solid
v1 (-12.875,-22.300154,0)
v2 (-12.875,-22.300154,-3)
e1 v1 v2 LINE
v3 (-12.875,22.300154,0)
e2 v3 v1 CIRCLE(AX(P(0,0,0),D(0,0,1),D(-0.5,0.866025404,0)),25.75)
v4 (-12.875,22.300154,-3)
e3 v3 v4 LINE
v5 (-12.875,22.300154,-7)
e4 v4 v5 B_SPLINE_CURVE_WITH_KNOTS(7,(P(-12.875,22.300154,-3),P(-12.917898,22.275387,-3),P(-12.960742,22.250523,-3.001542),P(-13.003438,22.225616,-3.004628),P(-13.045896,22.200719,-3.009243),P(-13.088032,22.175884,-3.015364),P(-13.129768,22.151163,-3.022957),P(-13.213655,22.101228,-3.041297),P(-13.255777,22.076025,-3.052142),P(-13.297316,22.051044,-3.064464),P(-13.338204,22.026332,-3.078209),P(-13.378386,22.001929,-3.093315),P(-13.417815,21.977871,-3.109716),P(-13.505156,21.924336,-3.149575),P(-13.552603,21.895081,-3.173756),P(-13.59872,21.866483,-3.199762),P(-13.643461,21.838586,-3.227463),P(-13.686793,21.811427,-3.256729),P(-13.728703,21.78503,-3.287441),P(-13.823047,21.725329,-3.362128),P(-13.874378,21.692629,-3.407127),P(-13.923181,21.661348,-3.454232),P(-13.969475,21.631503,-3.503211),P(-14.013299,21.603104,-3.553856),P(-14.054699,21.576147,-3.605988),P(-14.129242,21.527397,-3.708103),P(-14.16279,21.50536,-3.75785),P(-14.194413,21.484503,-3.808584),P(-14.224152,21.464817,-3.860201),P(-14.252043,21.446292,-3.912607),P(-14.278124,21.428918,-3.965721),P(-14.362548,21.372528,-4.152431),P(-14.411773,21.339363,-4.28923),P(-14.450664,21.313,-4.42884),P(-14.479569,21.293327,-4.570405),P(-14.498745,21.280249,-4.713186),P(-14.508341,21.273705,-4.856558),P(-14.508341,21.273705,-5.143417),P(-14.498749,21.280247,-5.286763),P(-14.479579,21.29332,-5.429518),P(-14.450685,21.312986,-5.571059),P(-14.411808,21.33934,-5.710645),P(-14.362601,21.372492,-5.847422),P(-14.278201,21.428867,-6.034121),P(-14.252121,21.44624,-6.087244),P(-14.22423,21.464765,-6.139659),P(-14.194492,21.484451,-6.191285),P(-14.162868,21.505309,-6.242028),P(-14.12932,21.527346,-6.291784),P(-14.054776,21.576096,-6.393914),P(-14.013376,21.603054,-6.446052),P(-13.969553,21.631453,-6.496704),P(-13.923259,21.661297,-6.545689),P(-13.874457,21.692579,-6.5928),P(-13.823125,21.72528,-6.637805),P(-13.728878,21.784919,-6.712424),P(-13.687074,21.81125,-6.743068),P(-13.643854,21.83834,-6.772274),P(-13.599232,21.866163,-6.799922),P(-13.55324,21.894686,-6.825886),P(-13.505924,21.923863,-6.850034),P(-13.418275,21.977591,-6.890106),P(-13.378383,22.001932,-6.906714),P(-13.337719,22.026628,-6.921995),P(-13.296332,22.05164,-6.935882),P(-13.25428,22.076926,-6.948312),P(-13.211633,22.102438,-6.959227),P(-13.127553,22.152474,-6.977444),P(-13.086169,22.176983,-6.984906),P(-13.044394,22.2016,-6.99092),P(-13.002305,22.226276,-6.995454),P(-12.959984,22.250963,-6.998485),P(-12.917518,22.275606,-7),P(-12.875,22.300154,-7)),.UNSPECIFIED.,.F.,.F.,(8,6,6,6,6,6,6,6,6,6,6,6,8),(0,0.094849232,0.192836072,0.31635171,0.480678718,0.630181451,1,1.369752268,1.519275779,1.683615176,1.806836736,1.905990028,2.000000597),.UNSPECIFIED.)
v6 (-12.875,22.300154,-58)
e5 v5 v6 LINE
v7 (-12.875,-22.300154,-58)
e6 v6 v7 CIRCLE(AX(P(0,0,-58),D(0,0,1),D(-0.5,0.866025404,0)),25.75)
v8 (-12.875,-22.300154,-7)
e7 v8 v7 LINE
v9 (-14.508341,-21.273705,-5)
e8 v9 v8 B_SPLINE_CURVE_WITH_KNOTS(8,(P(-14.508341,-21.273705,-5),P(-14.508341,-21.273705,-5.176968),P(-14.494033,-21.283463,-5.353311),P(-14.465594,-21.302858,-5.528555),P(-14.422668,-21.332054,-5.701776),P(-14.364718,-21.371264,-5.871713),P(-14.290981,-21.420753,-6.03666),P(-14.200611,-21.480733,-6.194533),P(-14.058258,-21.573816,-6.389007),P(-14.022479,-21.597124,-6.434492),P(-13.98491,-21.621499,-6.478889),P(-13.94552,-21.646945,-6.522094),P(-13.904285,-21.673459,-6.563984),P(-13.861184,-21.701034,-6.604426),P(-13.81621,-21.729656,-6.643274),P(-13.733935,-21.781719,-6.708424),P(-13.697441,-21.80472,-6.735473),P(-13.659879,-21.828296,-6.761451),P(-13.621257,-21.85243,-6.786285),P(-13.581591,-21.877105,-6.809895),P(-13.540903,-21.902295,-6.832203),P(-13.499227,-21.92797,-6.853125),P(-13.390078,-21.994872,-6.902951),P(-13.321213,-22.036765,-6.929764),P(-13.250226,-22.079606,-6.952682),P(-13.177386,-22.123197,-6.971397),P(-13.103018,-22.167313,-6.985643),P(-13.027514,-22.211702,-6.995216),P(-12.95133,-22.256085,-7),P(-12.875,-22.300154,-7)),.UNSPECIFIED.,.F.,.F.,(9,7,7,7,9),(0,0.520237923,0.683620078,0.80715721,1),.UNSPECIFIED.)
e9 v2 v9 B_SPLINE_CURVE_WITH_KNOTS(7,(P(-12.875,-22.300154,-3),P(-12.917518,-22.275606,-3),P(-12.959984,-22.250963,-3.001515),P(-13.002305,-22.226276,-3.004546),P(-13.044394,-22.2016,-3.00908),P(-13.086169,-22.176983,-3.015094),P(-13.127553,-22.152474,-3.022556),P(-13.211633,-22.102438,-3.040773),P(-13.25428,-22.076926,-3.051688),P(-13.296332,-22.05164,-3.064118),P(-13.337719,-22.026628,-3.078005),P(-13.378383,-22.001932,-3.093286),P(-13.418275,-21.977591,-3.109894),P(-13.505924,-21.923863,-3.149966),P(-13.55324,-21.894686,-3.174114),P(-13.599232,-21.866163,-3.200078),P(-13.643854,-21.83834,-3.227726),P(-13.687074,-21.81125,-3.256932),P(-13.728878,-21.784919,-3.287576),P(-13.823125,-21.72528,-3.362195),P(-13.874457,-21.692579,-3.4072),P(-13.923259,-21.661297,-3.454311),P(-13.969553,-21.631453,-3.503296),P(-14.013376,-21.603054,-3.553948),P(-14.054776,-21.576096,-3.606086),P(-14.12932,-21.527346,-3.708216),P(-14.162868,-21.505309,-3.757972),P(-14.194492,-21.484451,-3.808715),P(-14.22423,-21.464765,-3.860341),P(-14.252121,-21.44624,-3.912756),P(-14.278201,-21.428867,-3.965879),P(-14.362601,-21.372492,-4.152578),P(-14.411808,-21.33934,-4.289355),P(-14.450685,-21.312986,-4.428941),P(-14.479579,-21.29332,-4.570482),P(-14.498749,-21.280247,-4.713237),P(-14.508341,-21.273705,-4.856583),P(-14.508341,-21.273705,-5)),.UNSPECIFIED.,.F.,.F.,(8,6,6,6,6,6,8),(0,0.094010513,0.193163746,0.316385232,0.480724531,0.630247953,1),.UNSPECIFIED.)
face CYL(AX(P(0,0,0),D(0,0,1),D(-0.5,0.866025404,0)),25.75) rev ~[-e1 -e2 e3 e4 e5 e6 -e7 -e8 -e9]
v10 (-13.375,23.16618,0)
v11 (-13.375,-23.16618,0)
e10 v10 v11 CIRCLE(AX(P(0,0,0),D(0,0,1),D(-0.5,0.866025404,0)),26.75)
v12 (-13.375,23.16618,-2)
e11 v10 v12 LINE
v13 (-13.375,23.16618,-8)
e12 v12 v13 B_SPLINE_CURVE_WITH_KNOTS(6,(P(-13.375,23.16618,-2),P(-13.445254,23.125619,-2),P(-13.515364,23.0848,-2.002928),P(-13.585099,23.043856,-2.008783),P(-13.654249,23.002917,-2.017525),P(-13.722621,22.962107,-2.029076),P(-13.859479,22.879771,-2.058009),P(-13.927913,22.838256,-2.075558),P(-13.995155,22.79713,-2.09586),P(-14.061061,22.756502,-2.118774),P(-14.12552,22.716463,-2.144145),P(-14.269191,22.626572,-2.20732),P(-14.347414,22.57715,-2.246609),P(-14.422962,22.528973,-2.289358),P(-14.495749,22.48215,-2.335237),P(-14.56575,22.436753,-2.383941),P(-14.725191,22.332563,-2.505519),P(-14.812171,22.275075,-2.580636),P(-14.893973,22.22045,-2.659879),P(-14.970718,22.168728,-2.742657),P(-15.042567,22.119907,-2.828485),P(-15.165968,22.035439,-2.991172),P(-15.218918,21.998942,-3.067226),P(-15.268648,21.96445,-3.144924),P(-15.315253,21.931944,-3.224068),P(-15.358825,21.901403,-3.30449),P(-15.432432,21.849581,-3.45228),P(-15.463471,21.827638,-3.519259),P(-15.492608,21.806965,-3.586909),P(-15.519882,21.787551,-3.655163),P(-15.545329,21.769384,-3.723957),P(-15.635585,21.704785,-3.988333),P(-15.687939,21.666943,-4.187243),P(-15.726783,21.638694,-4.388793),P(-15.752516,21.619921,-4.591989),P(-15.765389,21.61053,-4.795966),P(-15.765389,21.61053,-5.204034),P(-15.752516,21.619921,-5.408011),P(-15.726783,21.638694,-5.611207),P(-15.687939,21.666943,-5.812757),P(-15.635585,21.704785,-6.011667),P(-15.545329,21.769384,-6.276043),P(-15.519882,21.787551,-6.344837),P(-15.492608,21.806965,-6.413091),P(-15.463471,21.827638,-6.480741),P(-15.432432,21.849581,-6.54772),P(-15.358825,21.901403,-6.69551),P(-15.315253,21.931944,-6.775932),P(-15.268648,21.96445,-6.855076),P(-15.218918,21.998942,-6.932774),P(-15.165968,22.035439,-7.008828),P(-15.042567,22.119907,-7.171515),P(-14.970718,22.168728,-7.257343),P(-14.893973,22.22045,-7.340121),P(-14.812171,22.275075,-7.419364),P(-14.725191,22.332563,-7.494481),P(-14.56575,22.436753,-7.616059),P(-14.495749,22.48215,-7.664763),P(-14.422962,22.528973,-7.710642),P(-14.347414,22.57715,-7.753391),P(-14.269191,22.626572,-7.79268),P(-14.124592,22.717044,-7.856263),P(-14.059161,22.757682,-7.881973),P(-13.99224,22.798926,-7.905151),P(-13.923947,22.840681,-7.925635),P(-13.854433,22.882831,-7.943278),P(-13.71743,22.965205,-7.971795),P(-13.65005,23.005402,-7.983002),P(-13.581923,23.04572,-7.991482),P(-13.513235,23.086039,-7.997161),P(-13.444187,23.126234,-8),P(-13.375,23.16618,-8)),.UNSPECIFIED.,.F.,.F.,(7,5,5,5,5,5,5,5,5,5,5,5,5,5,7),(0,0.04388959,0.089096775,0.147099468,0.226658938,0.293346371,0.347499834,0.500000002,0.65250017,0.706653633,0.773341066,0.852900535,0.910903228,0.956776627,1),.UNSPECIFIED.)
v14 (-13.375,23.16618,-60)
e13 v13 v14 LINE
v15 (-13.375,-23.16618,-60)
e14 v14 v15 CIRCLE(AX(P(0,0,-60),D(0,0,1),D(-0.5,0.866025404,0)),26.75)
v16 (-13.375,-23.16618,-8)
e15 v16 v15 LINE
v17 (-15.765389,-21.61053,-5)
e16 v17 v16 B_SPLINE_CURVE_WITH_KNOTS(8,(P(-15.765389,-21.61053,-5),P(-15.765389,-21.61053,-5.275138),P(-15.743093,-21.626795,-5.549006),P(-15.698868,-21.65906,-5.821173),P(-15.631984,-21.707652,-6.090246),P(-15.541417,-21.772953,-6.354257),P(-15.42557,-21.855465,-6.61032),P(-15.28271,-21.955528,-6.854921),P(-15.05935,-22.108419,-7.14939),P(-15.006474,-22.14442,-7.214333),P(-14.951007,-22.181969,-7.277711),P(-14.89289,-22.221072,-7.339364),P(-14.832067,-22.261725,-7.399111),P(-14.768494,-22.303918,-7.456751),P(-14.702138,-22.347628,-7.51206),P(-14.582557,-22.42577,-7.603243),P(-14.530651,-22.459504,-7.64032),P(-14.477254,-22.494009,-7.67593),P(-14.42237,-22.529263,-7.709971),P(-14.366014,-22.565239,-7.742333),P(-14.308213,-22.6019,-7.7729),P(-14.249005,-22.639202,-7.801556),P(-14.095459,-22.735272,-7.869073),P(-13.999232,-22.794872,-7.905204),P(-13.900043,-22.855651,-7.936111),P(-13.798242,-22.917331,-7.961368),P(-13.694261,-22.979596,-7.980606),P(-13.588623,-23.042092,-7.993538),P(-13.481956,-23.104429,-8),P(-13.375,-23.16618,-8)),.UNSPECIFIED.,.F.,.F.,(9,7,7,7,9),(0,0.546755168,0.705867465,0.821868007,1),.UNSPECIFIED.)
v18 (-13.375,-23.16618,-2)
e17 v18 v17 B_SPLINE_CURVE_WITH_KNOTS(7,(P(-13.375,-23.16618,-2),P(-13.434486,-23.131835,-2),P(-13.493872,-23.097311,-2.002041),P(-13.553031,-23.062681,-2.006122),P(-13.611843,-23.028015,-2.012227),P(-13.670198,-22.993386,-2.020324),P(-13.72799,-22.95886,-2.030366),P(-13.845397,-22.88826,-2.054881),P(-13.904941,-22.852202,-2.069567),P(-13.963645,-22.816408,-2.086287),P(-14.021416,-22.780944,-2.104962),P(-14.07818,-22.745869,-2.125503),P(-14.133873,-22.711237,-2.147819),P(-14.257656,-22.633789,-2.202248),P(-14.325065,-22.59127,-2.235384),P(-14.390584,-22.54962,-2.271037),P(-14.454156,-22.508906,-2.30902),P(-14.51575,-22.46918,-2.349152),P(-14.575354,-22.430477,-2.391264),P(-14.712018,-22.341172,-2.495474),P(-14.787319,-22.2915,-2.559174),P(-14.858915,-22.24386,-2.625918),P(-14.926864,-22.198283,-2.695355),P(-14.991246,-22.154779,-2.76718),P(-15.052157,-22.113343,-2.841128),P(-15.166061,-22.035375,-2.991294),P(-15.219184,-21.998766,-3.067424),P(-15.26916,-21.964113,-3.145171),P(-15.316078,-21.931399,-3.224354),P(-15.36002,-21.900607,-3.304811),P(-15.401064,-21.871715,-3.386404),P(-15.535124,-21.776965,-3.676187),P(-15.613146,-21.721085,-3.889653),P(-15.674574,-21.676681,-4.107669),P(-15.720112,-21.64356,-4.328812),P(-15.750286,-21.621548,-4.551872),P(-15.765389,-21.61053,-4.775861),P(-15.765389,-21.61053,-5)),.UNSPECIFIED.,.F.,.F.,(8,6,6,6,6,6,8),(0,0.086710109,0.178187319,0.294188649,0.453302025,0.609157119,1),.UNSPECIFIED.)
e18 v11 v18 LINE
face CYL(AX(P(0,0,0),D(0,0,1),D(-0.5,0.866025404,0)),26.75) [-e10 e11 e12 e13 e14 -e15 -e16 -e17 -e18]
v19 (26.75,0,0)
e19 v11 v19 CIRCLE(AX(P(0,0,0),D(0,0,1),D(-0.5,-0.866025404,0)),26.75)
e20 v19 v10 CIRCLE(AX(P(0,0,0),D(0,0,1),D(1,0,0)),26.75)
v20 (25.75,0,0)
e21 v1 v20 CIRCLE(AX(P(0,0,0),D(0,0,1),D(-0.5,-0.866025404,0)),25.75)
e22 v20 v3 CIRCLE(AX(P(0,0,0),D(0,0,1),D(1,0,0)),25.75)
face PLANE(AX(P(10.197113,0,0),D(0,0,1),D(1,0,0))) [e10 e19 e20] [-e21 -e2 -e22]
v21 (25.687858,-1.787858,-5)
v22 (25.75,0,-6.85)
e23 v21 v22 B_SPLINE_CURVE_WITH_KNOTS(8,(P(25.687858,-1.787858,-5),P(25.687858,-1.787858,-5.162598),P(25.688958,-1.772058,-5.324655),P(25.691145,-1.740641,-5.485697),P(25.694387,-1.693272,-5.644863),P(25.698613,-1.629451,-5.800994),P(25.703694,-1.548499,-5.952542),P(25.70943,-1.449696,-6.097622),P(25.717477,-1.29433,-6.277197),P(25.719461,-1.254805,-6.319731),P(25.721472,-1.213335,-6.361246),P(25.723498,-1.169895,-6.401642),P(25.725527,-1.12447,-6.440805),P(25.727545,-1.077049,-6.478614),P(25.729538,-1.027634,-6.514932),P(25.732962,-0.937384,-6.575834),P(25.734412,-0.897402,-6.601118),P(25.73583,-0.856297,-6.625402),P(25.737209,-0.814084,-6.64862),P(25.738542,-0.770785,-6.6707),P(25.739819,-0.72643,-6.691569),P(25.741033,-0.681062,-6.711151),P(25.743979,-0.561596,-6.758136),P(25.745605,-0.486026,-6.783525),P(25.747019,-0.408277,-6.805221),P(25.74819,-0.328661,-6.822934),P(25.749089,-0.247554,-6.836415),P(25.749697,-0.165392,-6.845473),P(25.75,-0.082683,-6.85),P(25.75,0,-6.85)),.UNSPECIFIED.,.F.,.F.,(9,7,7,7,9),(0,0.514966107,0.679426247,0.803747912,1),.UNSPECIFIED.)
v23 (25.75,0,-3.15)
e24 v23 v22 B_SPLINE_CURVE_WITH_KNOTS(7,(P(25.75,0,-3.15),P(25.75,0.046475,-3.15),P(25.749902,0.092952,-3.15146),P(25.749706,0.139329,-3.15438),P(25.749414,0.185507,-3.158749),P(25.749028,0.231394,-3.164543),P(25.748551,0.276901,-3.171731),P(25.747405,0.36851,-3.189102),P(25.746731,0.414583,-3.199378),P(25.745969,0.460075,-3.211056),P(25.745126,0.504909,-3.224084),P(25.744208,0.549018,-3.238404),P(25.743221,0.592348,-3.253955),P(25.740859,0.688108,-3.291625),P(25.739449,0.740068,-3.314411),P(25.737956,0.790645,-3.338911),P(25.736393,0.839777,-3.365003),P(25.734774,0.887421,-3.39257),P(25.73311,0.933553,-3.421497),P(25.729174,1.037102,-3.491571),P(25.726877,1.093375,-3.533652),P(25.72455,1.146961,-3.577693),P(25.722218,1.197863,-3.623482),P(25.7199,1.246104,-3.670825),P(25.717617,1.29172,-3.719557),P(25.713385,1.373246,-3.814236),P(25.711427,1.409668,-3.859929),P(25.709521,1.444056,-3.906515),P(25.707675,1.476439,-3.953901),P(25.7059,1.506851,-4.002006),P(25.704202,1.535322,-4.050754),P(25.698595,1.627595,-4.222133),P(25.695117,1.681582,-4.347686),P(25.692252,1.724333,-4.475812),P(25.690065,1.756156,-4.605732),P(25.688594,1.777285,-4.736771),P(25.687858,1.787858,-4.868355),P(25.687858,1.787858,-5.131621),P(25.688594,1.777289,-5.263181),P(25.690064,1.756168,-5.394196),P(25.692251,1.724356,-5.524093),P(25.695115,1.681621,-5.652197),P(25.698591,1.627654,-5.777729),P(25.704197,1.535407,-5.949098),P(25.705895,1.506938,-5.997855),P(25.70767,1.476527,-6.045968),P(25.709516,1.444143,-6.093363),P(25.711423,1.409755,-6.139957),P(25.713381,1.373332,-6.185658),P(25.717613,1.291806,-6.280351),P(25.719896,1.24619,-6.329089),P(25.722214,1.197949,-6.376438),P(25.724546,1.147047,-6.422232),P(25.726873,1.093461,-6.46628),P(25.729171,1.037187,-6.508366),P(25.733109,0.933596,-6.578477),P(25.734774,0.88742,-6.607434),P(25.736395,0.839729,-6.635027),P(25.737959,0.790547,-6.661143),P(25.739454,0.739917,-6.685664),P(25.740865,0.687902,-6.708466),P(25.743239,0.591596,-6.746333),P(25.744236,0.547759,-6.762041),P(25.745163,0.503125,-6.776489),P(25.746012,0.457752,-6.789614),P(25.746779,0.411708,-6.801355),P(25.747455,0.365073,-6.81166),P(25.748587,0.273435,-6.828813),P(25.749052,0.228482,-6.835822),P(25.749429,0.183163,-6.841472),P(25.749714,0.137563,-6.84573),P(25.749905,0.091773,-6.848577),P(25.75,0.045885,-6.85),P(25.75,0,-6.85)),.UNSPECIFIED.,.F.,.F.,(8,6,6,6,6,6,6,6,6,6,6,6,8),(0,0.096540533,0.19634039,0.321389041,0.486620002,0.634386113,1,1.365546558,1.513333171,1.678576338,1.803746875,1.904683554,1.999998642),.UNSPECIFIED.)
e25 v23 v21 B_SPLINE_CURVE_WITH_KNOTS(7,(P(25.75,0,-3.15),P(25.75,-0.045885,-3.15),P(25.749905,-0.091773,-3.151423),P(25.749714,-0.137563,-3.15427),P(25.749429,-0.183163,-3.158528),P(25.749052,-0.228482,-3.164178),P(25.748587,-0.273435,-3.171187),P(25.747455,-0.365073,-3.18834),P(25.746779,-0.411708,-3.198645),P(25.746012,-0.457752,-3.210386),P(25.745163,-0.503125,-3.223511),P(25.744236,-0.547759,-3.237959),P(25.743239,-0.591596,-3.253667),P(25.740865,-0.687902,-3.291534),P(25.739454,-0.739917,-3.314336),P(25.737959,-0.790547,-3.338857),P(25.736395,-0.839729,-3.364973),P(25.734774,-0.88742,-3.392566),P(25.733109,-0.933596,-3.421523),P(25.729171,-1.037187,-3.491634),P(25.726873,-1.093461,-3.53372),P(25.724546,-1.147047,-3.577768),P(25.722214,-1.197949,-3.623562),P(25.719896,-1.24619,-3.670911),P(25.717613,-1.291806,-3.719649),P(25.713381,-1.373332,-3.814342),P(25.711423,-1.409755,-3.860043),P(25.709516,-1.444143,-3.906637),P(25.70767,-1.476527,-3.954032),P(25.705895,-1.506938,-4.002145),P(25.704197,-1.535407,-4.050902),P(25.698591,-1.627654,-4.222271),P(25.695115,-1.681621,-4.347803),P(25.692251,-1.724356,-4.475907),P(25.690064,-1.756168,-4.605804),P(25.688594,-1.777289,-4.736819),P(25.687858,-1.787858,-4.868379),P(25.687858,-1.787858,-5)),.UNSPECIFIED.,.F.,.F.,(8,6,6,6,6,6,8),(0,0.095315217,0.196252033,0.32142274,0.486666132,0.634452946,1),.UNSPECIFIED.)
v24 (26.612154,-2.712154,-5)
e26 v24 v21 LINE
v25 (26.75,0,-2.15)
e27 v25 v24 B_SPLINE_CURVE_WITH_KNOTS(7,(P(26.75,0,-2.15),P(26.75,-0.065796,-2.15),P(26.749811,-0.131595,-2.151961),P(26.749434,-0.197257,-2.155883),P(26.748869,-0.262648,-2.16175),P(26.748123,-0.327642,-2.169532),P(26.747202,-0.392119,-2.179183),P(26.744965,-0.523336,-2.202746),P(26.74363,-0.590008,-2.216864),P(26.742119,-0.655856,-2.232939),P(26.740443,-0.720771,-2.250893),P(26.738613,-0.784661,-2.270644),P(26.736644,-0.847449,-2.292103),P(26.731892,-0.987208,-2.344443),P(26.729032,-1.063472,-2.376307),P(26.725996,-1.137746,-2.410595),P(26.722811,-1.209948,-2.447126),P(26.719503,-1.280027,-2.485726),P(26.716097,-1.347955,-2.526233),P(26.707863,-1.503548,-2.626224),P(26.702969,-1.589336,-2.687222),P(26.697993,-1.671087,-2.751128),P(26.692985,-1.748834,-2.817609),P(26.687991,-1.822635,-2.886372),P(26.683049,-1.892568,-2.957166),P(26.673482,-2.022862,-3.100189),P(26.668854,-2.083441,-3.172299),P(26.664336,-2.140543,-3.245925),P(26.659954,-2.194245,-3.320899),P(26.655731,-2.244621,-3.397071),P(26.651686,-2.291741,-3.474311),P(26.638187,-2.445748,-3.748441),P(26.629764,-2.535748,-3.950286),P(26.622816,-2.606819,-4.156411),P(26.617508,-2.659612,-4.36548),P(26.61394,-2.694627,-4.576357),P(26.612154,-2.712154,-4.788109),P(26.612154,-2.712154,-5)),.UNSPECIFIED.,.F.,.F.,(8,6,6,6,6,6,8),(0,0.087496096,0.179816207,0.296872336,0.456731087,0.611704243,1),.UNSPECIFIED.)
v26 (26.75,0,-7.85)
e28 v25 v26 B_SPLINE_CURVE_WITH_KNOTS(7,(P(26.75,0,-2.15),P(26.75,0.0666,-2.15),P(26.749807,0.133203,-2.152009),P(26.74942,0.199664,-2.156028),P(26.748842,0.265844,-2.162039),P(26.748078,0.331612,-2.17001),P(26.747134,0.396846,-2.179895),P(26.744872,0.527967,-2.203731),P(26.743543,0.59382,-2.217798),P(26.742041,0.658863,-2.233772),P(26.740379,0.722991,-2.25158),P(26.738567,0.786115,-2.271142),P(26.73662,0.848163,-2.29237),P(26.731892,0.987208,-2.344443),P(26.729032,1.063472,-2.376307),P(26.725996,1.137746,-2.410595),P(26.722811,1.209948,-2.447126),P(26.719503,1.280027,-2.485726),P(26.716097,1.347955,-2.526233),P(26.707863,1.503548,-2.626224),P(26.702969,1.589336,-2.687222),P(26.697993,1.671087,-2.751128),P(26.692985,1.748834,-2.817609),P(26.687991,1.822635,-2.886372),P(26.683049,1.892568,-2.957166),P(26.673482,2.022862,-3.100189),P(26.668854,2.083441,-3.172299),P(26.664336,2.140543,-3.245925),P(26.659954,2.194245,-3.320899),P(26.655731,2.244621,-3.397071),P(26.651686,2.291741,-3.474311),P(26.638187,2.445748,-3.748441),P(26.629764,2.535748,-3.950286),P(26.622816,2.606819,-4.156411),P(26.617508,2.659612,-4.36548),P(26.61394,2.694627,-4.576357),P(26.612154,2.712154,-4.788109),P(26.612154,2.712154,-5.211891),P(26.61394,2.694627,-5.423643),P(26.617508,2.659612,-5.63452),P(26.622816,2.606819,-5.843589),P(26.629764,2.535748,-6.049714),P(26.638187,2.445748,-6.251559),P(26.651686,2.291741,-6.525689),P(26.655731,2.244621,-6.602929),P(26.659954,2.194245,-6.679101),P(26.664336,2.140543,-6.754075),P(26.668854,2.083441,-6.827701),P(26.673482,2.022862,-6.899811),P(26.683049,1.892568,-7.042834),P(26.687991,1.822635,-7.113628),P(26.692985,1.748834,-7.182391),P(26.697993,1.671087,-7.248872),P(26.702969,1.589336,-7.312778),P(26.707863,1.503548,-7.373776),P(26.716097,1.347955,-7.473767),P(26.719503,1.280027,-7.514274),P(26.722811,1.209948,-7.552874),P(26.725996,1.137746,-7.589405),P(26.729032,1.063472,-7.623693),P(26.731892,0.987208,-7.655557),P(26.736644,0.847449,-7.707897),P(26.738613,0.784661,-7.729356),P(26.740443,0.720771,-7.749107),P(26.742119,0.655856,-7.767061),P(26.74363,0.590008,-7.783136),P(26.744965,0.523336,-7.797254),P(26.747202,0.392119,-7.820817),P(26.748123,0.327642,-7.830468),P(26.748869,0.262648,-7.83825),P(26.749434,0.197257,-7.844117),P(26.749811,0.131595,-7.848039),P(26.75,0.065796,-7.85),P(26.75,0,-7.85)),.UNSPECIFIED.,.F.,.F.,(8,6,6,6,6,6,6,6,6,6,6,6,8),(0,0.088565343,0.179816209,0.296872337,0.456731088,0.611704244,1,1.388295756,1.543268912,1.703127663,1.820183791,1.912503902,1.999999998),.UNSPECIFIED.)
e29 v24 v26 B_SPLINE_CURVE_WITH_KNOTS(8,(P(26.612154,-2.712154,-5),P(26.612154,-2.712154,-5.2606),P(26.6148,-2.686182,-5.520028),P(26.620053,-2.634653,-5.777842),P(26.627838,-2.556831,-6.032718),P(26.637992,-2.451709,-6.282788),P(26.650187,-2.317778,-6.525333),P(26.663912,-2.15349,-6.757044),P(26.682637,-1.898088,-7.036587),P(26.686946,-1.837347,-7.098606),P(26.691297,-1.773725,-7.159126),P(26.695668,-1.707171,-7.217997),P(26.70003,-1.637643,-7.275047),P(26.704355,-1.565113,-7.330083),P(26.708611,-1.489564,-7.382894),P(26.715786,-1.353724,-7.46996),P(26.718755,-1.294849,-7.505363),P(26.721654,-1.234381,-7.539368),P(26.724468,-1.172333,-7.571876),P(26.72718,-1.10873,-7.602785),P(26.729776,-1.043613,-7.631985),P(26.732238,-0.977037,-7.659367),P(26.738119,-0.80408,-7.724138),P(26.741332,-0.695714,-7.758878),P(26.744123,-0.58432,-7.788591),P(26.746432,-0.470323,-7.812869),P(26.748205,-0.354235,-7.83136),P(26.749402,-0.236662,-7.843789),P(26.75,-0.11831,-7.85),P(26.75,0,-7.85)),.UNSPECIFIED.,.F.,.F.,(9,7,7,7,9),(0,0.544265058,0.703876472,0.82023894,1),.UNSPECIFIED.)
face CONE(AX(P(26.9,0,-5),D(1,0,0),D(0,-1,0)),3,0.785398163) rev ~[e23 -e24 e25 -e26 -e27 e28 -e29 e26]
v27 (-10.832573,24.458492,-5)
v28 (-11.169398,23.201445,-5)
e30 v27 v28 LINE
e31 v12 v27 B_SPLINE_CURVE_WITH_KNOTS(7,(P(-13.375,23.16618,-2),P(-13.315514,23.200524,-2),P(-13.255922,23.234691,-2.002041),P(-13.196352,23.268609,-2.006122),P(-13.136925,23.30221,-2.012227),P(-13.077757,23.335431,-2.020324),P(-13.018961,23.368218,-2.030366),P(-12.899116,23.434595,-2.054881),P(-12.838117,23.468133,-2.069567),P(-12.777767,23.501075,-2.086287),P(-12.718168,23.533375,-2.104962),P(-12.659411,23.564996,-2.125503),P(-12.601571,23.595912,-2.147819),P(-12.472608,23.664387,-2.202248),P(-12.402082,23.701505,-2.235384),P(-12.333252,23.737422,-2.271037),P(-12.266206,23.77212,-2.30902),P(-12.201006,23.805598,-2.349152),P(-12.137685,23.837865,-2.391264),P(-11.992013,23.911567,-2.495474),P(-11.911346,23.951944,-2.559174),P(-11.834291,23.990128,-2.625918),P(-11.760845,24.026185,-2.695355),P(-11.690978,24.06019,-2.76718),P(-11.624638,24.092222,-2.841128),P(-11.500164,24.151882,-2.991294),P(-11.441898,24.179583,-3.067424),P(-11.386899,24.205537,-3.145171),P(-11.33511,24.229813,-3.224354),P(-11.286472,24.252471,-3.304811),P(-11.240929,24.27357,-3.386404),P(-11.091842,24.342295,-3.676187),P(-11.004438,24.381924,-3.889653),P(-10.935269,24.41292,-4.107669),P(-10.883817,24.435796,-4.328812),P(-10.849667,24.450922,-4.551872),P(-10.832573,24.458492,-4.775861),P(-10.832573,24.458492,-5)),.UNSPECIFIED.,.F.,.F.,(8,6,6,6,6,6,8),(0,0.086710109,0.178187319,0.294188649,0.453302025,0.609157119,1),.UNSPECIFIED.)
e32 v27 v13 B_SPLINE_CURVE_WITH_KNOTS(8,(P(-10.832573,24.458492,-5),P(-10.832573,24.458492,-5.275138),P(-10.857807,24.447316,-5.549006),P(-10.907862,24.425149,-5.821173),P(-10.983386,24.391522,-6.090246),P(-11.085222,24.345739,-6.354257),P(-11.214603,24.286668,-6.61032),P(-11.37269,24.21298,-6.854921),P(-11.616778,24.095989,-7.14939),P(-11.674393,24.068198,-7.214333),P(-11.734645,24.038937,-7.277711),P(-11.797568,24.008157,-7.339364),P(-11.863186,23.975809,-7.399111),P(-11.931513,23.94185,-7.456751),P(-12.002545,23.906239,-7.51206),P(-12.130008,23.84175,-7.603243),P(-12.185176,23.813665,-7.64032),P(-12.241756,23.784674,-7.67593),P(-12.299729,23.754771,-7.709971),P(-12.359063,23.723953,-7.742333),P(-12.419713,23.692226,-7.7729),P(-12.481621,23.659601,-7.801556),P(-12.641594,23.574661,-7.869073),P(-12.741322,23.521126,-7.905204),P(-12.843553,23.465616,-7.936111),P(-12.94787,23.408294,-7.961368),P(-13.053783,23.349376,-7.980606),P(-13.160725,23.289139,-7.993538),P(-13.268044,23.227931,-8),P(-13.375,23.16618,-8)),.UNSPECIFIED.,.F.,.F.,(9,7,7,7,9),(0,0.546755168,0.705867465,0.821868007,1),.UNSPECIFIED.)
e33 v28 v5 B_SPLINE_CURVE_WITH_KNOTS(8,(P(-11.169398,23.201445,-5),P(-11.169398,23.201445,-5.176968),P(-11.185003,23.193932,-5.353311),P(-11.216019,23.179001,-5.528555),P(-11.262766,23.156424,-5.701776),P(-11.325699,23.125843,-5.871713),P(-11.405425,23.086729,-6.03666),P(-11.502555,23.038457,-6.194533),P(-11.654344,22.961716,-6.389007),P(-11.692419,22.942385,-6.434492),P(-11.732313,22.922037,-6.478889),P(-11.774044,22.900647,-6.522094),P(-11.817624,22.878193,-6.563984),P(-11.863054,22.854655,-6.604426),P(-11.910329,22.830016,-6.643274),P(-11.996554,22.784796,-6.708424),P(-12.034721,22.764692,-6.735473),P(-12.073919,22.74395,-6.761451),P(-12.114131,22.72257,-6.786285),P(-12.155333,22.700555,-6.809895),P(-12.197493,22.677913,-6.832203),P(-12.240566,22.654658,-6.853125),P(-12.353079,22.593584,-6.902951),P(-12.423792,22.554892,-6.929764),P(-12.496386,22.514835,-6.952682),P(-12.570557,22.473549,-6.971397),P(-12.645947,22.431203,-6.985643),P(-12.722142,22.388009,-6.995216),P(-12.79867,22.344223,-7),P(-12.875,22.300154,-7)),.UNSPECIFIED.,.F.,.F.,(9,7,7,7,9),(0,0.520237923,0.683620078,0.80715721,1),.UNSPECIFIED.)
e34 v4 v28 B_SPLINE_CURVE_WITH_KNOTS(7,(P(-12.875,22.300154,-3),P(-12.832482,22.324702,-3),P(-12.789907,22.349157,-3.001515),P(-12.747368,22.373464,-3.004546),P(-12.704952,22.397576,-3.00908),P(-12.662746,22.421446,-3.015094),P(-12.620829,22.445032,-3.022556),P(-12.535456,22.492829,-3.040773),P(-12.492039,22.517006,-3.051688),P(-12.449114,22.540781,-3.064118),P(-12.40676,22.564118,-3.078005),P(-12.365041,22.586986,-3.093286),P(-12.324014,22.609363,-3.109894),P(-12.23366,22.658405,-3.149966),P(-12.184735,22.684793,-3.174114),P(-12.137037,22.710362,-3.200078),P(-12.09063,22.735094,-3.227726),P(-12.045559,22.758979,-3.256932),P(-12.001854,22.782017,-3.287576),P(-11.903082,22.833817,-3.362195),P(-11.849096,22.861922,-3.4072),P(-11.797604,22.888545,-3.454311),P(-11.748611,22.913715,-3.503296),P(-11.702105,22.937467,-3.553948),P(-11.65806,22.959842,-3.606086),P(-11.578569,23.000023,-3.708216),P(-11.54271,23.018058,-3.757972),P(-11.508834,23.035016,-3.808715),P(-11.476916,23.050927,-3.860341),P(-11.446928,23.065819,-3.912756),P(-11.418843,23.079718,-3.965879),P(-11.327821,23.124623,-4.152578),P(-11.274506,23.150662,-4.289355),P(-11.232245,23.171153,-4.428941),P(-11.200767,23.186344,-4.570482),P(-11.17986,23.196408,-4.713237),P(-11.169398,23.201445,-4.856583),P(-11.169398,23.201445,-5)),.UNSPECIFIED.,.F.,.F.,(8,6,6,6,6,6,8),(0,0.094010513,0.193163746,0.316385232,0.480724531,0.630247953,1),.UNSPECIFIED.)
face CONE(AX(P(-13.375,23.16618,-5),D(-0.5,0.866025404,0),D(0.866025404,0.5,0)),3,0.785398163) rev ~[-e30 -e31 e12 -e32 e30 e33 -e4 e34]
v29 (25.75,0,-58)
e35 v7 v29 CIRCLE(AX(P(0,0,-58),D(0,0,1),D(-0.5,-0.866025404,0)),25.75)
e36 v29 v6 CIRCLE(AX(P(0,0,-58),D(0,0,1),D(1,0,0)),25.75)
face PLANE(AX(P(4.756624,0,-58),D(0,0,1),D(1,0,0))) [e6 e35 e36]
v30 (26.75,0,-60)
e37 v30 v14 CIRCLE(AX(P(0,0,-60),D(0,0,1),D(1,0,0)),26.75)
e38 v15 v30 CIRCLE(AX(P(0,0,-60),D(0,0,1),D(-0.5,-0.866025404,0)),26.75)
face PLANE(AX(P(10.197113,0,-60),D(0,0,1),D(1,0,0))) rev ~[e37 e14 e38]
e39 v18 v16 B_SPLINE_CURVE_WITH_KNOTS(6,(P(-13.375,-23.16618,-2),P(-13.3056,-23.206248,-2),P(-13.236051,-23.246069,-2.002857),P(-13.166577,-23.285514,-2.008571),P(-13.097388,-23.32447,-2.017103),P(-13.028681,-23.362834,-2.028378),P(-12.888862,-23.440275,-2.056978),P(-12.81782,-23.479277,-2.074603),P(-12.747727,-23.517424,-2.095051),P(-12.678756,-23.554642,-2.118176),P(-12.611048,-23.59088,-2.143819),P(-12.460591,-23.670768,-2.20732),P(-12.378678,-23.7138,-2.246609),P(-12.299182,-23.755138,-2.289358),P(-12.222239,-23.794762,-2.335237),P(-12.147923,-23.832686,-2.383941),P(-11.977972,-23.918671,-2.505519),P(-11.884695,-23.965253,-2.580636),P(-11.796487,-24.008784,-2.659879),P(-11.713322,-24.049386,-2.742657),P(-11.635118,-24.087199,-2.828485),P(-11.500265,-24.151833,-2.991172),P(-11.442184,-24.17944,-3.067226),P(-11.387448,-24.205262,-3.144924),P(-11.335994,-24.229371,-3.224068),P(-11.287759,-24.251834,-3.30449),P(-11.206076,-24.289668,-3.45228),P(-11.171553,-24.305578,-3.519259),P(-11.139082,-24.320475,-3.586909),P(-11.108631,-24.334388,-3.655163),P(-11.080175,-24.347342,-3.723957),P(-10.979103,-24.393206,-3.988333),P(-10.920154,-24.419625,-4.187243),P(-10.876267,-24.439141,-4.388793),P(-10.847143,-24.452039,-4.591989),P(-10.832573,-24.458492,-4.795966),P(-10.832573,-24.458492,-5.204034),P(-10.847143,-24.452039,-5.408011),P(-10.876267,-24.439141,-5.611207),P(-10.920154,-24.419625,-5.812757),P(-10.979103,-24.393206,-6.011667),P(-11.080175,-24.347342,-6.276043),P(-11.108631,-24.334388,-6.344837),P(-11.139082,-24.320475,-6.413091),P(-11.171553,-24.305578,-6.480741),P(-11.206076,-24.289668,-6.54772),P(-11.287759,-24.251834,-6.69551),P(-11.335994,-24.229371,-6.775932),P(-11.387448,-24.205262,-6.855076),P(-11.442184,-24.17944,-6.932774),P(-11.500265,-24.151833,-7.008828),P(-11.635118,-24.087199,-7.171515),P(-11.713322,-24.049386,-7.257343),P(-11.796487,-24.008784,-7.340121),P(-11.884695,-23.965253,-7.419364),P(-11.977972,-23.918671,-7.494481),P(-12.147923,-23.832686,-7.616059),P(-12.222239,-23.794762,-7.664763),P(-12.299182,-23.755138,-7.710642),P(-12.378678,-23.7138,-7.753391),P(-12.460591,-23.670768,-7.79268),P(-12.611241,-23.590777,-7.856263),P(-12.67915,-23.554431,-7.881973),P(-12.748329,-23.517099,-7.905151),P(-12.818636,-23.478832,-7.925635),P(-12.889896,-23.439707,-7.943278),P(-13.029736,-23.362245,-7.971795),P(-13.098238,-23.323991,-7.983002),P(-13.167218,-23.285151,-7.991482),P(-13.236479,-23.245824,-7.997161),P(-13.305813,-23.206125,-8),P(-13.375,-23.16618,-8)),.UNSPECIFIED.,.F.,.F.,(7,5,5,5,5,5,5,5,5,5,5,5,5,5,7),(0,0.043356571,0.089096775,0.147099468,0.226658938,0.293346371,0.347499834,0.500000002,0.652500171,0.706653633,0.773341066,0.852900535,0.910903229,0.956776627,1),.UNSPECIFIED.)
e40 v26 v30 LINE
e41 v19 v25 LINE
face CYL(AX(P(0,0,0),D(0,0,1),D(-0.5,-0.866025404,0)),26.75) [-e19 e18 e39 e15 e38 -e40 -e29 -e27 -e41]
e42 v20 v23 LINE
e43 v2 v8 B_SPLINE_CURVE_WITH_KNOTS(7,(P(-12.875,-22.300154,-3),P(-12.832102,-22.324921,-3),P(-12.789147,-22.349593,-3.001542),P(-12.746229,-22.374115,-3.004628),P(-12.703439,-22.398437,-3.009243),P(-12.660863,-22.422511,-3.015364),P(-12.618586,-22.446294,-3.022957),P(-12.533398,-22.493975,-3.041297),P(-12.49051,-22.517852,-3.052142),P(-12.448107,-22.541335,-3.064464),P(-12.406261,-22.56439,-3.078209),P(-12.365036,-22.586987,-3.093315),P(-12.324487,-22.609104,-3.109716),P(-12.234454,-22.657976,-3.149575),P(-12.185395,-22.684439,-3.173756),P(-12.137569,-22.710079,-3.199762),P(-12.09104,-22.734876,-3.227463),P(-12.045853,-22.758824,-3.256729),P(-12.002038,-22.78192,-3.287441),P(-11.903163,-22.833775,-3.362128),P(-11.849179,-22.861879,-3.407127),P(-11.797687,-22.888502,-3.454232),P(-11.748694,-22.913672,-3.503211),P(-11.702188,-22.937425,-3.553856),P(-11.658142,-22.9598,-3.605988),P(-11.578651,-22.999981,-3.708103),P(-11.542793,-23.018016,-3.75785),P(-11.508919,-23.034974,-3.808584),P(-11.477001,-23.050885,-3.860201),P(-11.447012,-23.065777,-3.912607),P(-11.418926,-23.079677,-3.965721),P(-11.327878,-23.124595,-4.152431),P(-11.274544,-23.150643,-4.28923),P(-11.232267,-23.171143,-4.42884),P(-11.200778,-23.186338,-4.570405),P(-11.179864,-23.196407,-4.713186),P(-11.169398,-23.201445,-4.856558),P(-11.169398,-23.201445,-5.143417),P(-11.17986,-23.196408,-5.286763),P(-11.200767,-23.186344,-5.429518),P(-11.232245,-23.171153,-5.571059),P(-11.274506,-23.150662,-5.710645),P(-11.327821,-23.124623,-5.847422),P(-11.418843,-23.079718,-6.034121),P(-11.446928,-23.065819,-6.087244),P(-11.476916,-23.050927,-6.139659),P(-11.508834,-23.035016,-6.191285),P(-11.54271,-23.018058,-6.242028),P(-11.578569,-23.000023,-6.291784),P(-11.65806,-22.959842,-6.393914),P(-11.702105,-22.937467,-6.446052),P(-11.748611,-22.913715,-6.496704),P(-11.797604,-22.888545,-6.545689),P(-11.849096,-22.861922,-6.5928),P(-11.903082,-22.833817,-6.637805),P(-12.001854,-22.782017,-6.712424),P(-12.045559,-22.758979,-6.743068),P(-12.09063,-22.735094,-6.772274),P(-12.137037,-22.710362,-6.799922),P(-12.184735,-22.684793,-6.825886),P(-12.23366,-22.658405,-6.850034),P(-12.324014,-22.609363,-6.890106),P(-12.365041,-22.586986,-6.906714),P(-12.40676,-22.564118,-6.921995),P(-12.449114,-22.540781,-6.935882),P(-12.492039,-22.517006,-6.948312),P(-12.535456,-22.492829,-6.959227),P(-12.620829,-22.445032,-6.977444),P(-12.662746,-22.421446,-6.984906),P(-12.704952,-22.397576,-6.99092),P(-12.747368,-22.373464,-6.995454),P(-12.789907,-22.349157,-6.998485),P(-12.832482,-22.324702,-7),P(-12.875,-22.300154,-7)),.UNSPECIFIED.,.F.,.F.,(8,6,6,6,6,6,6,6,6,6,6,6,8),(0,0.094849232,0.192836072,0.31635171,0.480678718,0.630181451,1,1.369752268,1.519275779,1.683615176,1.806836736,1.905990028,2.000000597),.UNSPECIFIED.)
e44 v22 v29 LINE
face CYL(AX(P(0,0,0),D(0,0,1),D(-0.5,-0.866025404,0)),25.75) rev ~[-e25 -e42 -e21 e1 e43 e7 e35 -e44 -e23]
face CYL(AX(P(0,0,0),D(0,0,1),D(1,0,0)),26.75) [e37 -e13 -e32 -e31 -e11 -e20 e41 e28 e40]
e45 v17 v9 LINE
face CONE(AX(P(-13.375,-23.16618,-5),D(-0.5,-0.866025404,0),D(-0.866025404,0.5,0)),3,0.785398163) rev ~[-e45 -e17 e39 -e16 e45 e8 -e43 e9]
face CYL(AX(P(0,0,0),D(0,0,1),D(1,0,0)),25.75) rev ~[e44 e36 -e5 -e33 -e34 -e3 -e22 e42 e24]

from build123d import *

# Parameters (mm, degrees)
F1_DEPTH             = 60
F2_DEPTH             = 58
F9_D                 = 3.2
F9_DEPTH             = 4
F9_CSINK_D           = 6
F9_CSINK_ANGLE       = 90
F9_TIP               = 0.9613769904
F9_ON_F6_D           = 3.2
F9_ON_F6_DEPTH       = 4
F9_ON_F6_CSINK_D     = 6
F9_ON_F6_CSINK_ANGLE = 90
F9_ON_F6_TIP         = 0.9613769904
F9_ON_F8_D           = 3.2
F9_ON_F8_DEPTH       = 4
F9_ON_F8_CSINK_D     = 6
F9_ON_F8_CSINK_ANGLE = 90
F9_ON_F8_TIP         = 0.9613769904


# Not quite as in the source:
# - a feature names something its author has since deleted; it is built from what else it names


with BuildPart() as f1:
    # F0 (on Top) → F1 (new body)
    with BuildSketch(Plane.XY):
        with BuildLine():
            ThreePointArc((-13.375, -23.1661795512), (13.375, -23.1661795512), (26.75, 0))
            ThreePointArc((26.75, 0), (13.375, 23.1661795512), (-13.375, 23.1661795512))
            Line((-13.375, 23.1661795512), (-12.875, 22.3001541474))
            ThreePointArc((-12.875, 22.3001541474), (12.875, 22.3001541474), (25.75, 0))
            ThreePointArc((25.75, 0), (12.875, -22.3001541474), (-12.875, -22.3001541474))
            Line((-12.875, -22.3001541474), (-13.375, -23.1661795512))
        make_face()
        with BuildLine():
            Line((-12.875, 22.3001541474), (-13.375, 23.1661795512))
            ThreePointArc((-13.375, 23.1661795512), (-26.75, 0), (-13.375, -23.1661795512))
            Line((-13.375, -23.1661795512), (-12.875, -22.3001541474))
            ThreePointArc((-12.875, -22.3001541474), (-25.75, 0), (-12.875, 22.3001541474))
        make_face()
        with BuildLine():
            ThreePointArc((25.75, 0), (12.875, 22.3001541474), (-12.875, 22.3001541474))
            Line((-12.875, 22.3001541474), (0, 0))
            Line((0, 0), (-12.875, -22.3001541474))
            ThreePointArc((-12.875, -22.3001541474), (12.875, -22.3001541474), (25.75, 0))
        make_face()
        with BuildLine():
            Line((0, 0), (-12.875, 22.3001541474))
            ThreePointArc((-12.875, 22.3001541474), (-25.75, 0), (-12.875, -22.3001541474))
            Line((-12.875, -22.3001541474), (0, 0))
        make_face()
    extrude(amount=-F1_DEPTH)

    # F0 (on Top) → F2 (cut)
    with BuildSketch(Plane.XY):
        with BuildLine():
            ThreePointArc((25.75, 0), (12.875, 22.3001541474), (-12.875, 22.3001541474))
            Line((-12.875, 22.3001541474), (0, 0))
            Line((0, 0), (-12.875, -22.3001541474))
            ThreePointArc((-12.875, -22.3001541474), (12.875, -22.3001541474), (25.75, 0))
        make_face()
        with BuildLine():
            Line((0, 0), (-12.875, 22.3001541474))
            ThreePointArc((-12.875, 22.3001541474), (-25.75, 0), (-12.875, -22.3001541474))
            Line((-12.875, -22.3001541474), (0, 0))
        make_face()
    extrude(amount=-F2_DEPTH, mode=Mode.SUBTRACT)

    # F9
    with Locations(Plane(origin=(-13.375, 23.1661795512, 0), x_dir=(-0.8660254038, -0.5, 0), z_dir=(-0.5, 0.8660254038, 0))):
        with Locations((0, -5)):
            CounterSinkHole(F9_D / 2, F9_CSINK_D / 2, depth=F9_DEPTH, counter_sink_angle=F9_CSINK_ANGLE)
            with Locations((0, 0, -(F9_DEPTH + F9_TIP / 2))):  # 118° drill point
                Cone(0, F9_D / 2, F9_TIP, mode=Mode.SUBTRACT)

    # F9 on F6
    with Locations(Plane.YZ.offset(26.9)):
        with Locations((0, -5)):
            CounterSinkHole(F9_ON_F6_D / 2, F9_ON_F6_CSINK_D / 2, depth=F9_ON_F6_DEPTH, counter_sink_angle=F9_ON_F6_CSINK_ANGLE)
            with Locations((0, 0, -(F9_ON_F6_DEPTH + F9_ON_F6_TIP / 2))):  # 118° drill point
                Cone(0, F9_ON_F6_D / 2, F9_ON_F6_TIP, mode=Mode.SUBTRACT)

    # F9 on F8
    with Locations(Plane(origin=(-13.375, -23.1661795512, 0), x_dir=(0.8660254038, -0.5, 0), z_dir=(-0.5, -0.8660254038, 0))):
        with Locations((0, -5)):
            CounterSinkHole(F9_ON_F8_D / 2, F9_ON_F8_CSINK_D / 2, depth=F9_ON_F8_DEPTH, counter_sink_angle=F9_ON_F8_CSINK_ANGLE)
            with Locations((0, 0, -(F9_ON_F8_DEPTH + F9_ON_F8_TIP / 2))):  # 118° drill point
                Cone(0, F9_ON_F8_D / 2, F9_ON_F8_TIP, mode=Mode.SUBTRACT)


solid = f1.part
